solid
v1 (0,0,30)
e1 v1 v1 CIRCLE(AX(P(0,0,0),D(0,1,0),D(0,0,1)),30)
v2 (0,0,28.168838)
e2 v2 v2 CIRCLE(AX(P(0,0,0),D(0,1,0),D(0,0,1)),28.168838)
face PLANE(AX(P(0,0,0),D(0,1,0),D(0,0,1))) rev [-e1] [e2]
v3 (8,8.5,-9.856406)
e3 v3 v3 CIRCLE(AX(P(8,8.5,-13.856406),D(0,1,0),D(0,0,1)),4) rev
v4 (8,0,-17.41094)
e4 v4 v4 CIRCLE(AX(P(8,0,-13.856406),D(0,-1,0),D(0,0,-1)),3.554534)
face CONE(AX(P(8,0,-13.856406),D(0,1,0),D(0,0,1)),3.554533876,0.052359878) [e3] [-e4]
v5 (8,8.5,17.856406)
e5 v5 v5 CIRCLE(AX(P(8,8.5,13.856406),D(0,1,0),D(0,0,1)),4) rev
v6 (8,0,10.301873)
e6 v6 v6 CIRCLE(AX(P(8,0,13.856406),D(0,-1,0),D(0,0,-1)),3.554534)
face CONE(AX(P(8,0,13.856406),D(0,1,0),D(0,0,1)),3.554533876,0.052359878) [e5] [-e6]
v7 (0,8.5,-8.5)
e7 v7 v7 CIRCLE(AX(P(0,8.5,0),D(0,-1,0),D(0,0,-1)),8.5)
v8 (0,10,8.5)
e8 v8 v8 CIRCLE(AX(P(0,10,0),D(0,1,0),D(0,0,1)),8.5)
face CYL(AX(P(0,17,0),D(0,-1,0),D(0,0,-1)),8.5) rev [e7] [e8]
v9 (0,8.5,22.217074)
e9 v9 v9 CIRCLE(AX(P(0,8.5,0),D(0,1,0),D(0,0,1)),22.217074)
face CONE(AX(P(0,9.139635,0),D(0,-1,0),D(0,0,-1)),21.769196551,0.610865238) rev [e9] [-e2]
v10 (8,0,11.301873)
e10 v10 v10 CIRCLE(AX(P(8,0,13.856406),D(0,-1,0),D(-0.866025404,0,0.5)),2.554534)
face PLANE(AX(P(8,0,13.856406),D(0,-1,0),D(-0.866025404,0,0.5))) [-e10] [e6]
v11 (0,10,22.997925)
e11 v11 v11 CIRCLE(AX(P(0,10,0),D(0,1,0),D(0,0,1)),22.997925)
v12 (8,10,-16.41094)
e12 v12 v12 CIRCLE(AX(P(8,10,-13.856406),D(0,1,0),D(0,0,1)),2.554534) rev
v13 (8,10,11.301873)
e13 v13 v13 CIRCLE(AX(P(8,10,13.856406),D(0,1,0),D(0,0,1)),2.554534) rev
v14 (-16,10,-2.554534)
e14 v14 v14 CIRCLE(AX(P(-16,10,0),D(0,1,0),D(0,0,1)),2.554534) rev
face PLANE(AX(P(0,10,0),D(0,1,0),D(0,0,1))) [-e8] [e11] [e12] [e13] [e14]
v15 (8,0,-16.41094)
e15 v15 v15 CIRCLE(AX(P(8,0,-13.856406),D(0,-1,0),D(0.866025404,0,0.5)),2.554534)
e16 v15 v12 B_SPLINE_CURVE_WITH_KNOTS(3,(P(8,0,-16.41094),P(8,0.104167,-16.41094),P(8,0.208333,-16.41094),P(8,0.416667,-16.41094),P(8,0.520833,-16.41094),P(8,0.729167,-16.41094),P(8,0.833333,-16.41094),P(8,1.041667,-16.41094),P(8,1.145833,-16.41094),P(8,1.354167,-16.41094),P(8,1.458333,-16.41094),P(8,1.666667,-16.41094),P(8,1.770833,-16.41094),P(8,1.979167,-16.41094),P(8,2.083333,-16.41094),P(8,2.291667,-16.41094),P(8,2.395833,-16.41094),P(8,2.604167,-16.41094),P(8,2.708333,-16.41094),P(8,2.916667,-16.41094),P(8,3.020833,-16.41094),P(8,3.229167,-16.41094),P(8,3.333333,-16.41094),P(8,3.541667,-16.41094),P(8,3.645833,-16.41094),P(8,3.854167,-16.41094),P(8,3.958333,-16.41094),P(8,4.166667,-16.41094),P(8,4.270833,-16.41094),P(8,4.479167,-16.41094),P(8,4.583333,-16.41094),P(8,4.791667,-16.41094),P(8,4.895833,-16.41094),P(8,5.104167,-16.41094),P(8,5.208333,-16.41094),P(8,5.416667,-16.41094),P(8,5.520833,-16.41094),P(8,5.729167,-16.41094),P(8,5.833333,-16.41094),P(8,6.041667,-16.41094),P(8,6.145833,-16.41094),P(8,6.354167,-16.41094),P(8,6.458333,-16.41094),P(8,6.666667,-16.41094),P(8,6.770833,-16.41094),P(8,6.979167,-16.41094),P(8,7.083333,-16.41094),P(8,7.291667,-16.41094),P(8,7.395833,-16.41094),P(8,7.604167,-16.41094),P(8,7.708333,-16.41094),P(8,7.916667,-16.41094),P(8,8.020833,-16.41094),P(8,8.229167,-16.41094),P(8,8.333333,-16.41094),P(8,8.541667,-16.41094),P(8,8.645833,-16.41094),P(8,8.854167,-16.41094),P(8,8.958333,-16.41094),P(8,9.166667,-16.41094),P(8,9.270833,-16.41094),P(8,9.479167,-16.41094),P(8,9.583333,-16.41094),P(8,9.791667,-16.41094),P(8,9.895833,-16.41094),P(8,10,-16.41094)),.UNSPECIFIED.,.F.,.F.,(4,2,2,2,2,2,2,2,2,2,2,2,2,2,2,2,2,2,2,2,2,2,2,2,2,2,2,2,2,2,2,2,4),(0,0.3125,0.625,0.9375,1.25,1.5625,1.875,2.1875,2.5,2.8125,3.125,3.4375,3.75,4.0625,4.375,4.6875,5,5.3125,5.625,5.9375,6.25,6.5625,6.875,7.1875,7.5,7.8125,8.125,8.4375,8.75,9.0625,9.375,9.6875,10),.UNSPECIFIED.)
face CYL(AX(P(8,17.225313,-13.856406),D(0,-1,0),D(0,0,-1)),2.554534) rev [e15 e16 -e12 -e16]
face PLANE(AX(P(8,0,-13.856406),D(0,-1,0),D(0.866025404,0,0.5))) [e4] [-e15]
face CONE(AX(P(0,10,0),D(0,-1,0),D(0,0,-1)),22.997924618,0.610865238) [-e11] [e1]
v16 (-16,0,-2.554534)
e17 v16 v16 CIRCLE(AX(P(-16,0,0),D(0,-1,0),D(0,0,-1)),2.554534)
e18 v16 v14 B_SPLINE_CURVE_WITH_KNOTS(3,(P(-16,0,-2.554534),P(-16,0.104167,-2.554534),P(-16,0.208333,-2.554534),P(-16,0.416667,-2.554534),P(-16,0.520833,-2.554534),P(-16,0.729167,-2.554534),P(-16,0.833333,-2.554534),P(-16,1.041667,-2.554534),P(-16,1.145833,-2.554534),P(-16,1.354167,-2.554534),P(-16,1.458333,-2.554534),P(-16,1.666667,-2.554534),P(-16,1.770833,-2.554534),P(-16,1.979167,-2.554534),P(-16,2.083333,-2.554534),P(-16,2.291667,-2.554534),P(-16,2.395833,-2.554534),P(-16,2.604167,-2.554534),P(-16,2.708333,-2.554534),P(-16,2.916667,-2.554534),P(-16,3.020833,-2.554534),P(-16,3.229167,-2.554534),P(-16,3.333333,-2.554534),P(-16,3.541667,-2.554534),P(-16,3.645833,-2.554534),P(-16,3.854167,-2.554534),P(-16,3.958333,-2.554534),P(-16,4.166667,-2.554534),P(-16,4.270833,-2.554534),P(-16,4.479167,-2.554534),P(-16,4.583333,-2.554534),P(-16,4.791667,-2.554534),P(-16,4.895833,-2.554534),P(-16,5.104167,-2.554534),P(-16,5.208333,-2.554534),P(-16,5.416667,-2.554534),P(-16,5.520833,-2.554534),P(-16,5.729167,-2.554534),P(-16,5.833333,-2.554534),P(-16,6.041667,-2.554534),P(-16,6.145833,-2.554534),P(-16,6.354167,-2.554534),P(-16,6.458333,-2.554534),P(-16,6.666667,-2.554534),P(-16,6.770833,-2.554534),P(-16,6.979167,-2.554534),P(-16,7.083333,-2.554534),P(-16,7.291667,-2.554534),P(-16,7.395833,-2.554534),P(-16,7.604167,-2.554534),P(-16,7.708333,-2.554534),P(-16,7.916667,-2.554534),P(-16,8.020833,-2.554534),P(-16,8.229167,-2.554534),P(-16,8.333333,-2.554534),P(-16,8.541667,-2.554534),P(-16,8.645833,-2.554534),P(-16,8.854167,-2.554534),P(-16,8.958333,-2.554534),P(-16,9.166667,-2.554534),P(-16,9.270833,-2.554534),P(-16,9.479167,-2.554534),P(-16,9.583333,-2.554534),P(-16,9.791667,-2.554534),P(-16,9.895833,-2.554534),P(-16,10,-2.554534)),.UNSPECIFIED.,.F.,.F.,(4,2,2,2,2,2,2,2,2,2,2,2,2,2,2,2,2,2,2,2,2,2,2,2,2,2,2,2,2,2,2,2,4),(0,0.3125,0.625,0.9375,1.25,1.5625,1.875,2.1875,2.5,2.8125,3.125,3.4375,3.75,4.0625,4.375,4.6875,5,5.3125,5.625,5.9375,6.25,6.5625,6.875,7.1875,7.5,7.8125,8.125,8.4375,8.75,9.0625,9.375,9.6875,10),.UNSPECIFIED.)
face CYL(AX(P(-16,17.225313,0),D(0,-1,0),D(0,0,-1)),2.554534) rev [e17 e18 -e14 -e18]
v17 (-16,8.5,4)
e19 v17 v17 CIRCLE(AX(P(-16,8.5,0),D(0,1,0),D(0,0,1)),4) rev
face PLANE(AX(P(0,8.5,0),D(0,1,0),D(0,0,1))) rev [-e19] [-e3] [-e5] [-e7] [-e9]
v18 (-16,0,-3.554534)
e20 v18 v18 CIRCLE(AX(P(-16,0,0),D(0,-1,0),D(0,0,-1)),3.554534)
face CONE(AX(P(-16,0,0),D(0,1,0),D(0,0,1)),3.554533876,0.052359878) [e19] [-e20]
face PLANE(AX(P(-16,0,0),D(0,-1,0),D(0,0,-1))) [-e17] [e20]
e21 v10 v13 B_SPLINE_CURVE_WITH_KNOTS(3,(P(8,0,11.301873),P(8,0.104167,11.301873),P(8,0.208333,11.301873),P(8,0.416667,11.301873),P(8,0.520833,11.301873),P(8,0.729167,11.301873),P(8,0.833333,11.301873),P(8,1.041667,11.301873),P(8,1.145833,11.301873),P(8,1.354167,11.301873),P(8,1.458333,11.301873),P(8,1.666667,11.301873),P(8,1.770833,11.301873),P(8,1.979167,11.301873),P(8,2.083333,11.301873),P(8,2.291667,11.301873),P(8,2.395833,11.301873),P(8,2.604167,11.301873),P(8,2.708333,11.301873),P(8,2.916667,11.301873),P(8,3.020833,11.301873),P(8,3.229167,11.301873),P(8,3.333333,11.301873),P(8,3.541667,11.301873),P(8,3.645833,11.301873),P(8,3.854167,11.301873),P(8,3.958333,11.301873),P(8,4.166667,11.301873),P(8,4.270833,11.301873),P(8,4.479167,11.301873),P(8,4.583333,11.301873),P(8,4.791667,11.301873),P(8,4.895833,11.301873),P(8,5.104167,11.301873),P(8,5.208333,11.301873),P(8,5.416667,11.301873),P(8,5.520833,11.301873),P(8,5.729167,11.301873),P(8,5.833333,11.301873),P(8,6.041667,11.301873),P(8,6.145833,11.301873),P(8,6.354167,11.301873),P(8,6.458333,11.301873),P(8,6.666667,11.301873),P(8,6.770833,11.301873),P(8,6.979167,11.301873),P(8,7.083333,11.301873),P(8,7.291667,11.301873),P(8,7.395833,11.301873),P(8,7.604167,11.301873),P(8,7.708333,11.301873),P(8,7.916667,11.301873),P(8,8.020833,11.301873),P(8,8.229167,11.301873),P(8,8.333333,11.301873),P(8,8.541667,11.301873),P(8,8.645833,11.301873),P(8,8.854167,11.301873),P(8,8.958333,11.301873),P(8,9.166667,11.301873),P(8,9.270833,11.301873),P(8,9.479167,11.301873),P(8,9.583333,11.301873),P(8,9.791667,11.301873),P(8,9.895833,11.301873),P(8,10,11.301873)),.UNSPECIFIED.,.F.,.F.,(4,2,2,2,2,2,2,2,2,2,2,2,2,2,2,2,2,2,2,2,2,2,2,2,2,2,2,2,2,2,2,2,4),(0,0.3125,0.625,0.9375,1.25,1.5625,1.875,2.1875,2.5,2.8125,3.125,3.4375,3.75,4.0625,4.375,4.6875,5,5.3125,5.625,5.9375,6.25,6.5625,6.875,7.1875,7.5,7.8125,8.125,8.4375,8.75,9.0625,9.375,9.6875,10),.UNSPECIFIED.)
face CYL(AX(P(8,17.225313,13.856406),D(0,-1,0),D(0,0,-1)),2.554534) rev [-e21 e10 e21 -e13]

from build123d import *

# Parameters (mm, degrees)
ESQUISSE1_R                                 = 30
BOSS_EXTRU_1_DEPTH                          = 10
CHANFREIN1_SIZE                             = 10
CHANFREIN1_SIZE_2                           = 7.002075382
COQUE2_T                                    = -1.5
ESQUISSE2_R                                 = 4.000000000000001
BOSS_EXTRU_2_DEPTH                          = 8.5
CHANFREIN2_SIZE                             = 8.5
CHANFREIN2_SIZE_2                           = 0.445466124
ESQUISSE5_R                                 = 2.5545338760941463
ENL_V_MAT_EXTRU_1_DEPTH                     = 10
R_P_TITION_CIRCULAIRE1_COUNT                = 3
CHANFREIN2_OF_R_P_TITION_CIRCULAIRE1_SIZE   = 0.445466124
CHANFREIN2_OF_R_P_TITION_CIRCULAIRE1_SIZE_2 = 8.5
ESQUISSE6_R                                 = 8.5
ENL_V_MAT_EXTRU_2_DEPTH                     = 8.5


with BuildPart() as part:
    # Esquisse1 → Boss.-Extru.1 (new body)
    with BuildSketch(Plane(origin=(0, 0, 0), x_dir=(1, 0, 0), z_dir=(0, 1, 0))):
        with Locations(Location((0, 0, 0), (0, 0, 270))):
            Circle(ESQUISSE1_R)
    extrude(amount=BOSS_EXTRU_1_DEPTH)

    # Chanfrein1
    # the kernel refuses this chamfer: 10, 7.002075382 mm, written as the material it takes off along each edge
    with BuildSketch(Plane(origin=(0, 10, 0), x_dir=(-1.8e-16, 0, 1), z_dir=(-1, 0, -1.8e-16))) as chanfrein1_piece_1:
        Polygon((30, -CHANFREIN1_SIZE), (30 - CHANFREIN1_SIZE_2, 0), (30, 0), align=None)
    revolve(axis=Axis((0, 10, 0), (0, 1, 0)), mode=Mode.SUBTRACT)

    # Coque2
    coque2_openings = [part.faces().sort_by_distance(p)[0] for p in [
        (0, 0, 0),
    ]]
    offset(amount=COQUE2_T, openings=coque2_openings, kind=Kind.INTERSECTION)

    # Esquisse2 → Boss.-Extru.2 (add)
    with BuildSketch(Plane.XZ.offset(-8.5)):
        with Locations(Location((-16, 0, 0), (0, 0, 90))):
            Circle(ESQUISSE2_R)
    boss_extru_2 = extrude(amount=BOSS_EXTRU_2_DEPTH)

    # Chanfrein2
    # the kernel refuses this chamfer: 8.5, 0.445466124 mm, written as the material it takes off along each edge
    with BuildSketch(Plane(origin=(-16, 0, 0), x_dir=(0, 0, 1), z_dir=(1, 0, 0))) as chanfrein2_piece_1_section:
        Polygon((4.000000000000001, -CHANFREIN2_SIZE), (4.000000000000001 - CHANFREIN2_SIZE_2, 0), (4.000000000000001, 0), align=None)
    chanfrein2_piece_1 = revolve(axis=Axis((-16, 0, 0), (0, -1, 0)), mode=Mode.PRIVATE)
    chanfrein2_piece_1 = split(chanfrein2_piece_1, bisect_by=Plane(origin=(-16, 8.5, -3.8124488578332274), z_dir=(0, -1, 0)), keep=Keep.TOP, mode=Mode.PRIVATE)
    add(chanfrein2_piece_1, mode=Mode.SUBTRACT)

    # Esquisse5 → Enlèv. mat.-Extru.1 (cut)
    with BuildSketch(Plane.XZ):
        with Locations(Location((-16, 0, 0), (0, 0, 270))):
            Circle(ESQUISSE5_R)
    enl_v_mat_extru_1 = extrude(amount=-ENL_V_MAT_EXTRU_1_DEPTH, mode=Mode.SUBTRACT)

    # Répétition circulaire1: Boss.-Extru.2, Enlèv. mat.-Extru.1 ×3 about axis
    r_p_tition_circulaire1_axis = Axis((9.3e-16, 0, 6.2e-16), (0, 1, 0))
    add([boss_extru_2.rotate(r_p_tition_circulaire1_axis, i * 360 / R_P_TITION_CIRCULAIRE1_COUNT) for i in range(1, R_P_TITION_CIRCULAIRE1_COUNT)])
    add([enl_v_mat_extru_1.rotate(r_p_tition_circulaire1_axis, i * 360 / R_P_TITION_CIRCULAIRE1_COUNT) for i in range(1, R_P_TITION_CIRCULAIRE1_COUNT)], mode=Mode.SUBTRACT)

    # Chanfrein2 of Répétition circulaire1
    # the kernel refuses this chamfer: 8.5, 0.445466124 mm, written as the material it takes off along each edge
    with BuildSketch(Plane(origin=(7.999999999999997, 0, 13.856406460551021), x_dir=(0.8660254037844387, 0, -0.5000000000000001), z_dir=(-0.5000000000000001, 0, -0.8660254037844387))) as chanfrein2_of_r_p_tition_circulaire1_piece_1_section:
        Polygon((4 - CHANFREIN2_OF_R_P_TITION_CIRCULAIRE1_SIZE, 0), (4.000000000000002, -CHANFREIN2_OF_R_P_TITION_CIRCULAIRE1_SIZE_2), (4, 0), align=None)
    chanfrein2_of_r_p_tition_circulaire1_piece_1 = revolve(axis=Axis((7.999999999999997, 0, 13.856406460551021), (0, -1, 0)), mode=Mode.PRIVATE)
    chanfrein2_of_r_p_tition_circulaire1_piece_1 = split(chanfrein2_of_r_p_tition_circulaire1_piece_1, bisect_by=Plane(origin=(4.6983224384874545, 8.5, 15.762630889467637), z_dir=(0, -1, 0)), keep=Keep.TOP, mode=Mode.PRIVATE)
    add(chanfrein2_of_r_p_tition_circulaire1_piece_1, mode=Mode.SUBTRACT)
    with BuildSketch(Plane(origin=(8.000000000000009, 0, -13.856406460551014), x_dir=(-0.8660254037844384, 0, -0.5000000000000003), z_dir=(-0.5000000000000003, 0, 0.8660254037844384))) as chanfrein2_of_r_p_tition_circulaire1_piece_2_section:
        Polygon((4 - CHANFREIN2_OF_R_P_TITION_CIRCULAIRE1_SIZE, 0), (4, -CHANFREIN2_OF_R_P_TITION_CIRCULAIRE1_SIZE_2), (4, 0), align=None)
    chanfrein2_of_r_p_tition_circulaire1_piece_2 = revolve(axis=Axis((8.000000000000009, 0, -13.856406460551014), (0, -1, 0)), mode=Mode.PRIVATE)
    chanfrein2_of_r_p_tition_circulaire1_piece_2 = split(chanfrein2_of_r_p_tition_circulaire1_piece_2, bisect_by=Plane(origin=(11.301677561512552, 8.5, -11.950182031634398), z_dir=(0, -1, 0)), keep=Keep.TOP, mode=Mode.PRIVATE)
    add(chanfrein2_of_r_p_tition_circulaire1_piece_2, mode=Mode.SUBTRACT)

    # Esquisse6 → Enlèv. mat.-Extru.2 (cut)
    with BuildSketch(Plane.XZ.offset(-8.5)):
        with Locations(Location((0, 0, 0), (0, 0, 270))):
            Circle(ESQUISSE6_R)
    extrude(amount=-ENL_V_MAT_EXTRU_2_DEPTH, mode=Mode.SUBTRACT)


solid = part.part
